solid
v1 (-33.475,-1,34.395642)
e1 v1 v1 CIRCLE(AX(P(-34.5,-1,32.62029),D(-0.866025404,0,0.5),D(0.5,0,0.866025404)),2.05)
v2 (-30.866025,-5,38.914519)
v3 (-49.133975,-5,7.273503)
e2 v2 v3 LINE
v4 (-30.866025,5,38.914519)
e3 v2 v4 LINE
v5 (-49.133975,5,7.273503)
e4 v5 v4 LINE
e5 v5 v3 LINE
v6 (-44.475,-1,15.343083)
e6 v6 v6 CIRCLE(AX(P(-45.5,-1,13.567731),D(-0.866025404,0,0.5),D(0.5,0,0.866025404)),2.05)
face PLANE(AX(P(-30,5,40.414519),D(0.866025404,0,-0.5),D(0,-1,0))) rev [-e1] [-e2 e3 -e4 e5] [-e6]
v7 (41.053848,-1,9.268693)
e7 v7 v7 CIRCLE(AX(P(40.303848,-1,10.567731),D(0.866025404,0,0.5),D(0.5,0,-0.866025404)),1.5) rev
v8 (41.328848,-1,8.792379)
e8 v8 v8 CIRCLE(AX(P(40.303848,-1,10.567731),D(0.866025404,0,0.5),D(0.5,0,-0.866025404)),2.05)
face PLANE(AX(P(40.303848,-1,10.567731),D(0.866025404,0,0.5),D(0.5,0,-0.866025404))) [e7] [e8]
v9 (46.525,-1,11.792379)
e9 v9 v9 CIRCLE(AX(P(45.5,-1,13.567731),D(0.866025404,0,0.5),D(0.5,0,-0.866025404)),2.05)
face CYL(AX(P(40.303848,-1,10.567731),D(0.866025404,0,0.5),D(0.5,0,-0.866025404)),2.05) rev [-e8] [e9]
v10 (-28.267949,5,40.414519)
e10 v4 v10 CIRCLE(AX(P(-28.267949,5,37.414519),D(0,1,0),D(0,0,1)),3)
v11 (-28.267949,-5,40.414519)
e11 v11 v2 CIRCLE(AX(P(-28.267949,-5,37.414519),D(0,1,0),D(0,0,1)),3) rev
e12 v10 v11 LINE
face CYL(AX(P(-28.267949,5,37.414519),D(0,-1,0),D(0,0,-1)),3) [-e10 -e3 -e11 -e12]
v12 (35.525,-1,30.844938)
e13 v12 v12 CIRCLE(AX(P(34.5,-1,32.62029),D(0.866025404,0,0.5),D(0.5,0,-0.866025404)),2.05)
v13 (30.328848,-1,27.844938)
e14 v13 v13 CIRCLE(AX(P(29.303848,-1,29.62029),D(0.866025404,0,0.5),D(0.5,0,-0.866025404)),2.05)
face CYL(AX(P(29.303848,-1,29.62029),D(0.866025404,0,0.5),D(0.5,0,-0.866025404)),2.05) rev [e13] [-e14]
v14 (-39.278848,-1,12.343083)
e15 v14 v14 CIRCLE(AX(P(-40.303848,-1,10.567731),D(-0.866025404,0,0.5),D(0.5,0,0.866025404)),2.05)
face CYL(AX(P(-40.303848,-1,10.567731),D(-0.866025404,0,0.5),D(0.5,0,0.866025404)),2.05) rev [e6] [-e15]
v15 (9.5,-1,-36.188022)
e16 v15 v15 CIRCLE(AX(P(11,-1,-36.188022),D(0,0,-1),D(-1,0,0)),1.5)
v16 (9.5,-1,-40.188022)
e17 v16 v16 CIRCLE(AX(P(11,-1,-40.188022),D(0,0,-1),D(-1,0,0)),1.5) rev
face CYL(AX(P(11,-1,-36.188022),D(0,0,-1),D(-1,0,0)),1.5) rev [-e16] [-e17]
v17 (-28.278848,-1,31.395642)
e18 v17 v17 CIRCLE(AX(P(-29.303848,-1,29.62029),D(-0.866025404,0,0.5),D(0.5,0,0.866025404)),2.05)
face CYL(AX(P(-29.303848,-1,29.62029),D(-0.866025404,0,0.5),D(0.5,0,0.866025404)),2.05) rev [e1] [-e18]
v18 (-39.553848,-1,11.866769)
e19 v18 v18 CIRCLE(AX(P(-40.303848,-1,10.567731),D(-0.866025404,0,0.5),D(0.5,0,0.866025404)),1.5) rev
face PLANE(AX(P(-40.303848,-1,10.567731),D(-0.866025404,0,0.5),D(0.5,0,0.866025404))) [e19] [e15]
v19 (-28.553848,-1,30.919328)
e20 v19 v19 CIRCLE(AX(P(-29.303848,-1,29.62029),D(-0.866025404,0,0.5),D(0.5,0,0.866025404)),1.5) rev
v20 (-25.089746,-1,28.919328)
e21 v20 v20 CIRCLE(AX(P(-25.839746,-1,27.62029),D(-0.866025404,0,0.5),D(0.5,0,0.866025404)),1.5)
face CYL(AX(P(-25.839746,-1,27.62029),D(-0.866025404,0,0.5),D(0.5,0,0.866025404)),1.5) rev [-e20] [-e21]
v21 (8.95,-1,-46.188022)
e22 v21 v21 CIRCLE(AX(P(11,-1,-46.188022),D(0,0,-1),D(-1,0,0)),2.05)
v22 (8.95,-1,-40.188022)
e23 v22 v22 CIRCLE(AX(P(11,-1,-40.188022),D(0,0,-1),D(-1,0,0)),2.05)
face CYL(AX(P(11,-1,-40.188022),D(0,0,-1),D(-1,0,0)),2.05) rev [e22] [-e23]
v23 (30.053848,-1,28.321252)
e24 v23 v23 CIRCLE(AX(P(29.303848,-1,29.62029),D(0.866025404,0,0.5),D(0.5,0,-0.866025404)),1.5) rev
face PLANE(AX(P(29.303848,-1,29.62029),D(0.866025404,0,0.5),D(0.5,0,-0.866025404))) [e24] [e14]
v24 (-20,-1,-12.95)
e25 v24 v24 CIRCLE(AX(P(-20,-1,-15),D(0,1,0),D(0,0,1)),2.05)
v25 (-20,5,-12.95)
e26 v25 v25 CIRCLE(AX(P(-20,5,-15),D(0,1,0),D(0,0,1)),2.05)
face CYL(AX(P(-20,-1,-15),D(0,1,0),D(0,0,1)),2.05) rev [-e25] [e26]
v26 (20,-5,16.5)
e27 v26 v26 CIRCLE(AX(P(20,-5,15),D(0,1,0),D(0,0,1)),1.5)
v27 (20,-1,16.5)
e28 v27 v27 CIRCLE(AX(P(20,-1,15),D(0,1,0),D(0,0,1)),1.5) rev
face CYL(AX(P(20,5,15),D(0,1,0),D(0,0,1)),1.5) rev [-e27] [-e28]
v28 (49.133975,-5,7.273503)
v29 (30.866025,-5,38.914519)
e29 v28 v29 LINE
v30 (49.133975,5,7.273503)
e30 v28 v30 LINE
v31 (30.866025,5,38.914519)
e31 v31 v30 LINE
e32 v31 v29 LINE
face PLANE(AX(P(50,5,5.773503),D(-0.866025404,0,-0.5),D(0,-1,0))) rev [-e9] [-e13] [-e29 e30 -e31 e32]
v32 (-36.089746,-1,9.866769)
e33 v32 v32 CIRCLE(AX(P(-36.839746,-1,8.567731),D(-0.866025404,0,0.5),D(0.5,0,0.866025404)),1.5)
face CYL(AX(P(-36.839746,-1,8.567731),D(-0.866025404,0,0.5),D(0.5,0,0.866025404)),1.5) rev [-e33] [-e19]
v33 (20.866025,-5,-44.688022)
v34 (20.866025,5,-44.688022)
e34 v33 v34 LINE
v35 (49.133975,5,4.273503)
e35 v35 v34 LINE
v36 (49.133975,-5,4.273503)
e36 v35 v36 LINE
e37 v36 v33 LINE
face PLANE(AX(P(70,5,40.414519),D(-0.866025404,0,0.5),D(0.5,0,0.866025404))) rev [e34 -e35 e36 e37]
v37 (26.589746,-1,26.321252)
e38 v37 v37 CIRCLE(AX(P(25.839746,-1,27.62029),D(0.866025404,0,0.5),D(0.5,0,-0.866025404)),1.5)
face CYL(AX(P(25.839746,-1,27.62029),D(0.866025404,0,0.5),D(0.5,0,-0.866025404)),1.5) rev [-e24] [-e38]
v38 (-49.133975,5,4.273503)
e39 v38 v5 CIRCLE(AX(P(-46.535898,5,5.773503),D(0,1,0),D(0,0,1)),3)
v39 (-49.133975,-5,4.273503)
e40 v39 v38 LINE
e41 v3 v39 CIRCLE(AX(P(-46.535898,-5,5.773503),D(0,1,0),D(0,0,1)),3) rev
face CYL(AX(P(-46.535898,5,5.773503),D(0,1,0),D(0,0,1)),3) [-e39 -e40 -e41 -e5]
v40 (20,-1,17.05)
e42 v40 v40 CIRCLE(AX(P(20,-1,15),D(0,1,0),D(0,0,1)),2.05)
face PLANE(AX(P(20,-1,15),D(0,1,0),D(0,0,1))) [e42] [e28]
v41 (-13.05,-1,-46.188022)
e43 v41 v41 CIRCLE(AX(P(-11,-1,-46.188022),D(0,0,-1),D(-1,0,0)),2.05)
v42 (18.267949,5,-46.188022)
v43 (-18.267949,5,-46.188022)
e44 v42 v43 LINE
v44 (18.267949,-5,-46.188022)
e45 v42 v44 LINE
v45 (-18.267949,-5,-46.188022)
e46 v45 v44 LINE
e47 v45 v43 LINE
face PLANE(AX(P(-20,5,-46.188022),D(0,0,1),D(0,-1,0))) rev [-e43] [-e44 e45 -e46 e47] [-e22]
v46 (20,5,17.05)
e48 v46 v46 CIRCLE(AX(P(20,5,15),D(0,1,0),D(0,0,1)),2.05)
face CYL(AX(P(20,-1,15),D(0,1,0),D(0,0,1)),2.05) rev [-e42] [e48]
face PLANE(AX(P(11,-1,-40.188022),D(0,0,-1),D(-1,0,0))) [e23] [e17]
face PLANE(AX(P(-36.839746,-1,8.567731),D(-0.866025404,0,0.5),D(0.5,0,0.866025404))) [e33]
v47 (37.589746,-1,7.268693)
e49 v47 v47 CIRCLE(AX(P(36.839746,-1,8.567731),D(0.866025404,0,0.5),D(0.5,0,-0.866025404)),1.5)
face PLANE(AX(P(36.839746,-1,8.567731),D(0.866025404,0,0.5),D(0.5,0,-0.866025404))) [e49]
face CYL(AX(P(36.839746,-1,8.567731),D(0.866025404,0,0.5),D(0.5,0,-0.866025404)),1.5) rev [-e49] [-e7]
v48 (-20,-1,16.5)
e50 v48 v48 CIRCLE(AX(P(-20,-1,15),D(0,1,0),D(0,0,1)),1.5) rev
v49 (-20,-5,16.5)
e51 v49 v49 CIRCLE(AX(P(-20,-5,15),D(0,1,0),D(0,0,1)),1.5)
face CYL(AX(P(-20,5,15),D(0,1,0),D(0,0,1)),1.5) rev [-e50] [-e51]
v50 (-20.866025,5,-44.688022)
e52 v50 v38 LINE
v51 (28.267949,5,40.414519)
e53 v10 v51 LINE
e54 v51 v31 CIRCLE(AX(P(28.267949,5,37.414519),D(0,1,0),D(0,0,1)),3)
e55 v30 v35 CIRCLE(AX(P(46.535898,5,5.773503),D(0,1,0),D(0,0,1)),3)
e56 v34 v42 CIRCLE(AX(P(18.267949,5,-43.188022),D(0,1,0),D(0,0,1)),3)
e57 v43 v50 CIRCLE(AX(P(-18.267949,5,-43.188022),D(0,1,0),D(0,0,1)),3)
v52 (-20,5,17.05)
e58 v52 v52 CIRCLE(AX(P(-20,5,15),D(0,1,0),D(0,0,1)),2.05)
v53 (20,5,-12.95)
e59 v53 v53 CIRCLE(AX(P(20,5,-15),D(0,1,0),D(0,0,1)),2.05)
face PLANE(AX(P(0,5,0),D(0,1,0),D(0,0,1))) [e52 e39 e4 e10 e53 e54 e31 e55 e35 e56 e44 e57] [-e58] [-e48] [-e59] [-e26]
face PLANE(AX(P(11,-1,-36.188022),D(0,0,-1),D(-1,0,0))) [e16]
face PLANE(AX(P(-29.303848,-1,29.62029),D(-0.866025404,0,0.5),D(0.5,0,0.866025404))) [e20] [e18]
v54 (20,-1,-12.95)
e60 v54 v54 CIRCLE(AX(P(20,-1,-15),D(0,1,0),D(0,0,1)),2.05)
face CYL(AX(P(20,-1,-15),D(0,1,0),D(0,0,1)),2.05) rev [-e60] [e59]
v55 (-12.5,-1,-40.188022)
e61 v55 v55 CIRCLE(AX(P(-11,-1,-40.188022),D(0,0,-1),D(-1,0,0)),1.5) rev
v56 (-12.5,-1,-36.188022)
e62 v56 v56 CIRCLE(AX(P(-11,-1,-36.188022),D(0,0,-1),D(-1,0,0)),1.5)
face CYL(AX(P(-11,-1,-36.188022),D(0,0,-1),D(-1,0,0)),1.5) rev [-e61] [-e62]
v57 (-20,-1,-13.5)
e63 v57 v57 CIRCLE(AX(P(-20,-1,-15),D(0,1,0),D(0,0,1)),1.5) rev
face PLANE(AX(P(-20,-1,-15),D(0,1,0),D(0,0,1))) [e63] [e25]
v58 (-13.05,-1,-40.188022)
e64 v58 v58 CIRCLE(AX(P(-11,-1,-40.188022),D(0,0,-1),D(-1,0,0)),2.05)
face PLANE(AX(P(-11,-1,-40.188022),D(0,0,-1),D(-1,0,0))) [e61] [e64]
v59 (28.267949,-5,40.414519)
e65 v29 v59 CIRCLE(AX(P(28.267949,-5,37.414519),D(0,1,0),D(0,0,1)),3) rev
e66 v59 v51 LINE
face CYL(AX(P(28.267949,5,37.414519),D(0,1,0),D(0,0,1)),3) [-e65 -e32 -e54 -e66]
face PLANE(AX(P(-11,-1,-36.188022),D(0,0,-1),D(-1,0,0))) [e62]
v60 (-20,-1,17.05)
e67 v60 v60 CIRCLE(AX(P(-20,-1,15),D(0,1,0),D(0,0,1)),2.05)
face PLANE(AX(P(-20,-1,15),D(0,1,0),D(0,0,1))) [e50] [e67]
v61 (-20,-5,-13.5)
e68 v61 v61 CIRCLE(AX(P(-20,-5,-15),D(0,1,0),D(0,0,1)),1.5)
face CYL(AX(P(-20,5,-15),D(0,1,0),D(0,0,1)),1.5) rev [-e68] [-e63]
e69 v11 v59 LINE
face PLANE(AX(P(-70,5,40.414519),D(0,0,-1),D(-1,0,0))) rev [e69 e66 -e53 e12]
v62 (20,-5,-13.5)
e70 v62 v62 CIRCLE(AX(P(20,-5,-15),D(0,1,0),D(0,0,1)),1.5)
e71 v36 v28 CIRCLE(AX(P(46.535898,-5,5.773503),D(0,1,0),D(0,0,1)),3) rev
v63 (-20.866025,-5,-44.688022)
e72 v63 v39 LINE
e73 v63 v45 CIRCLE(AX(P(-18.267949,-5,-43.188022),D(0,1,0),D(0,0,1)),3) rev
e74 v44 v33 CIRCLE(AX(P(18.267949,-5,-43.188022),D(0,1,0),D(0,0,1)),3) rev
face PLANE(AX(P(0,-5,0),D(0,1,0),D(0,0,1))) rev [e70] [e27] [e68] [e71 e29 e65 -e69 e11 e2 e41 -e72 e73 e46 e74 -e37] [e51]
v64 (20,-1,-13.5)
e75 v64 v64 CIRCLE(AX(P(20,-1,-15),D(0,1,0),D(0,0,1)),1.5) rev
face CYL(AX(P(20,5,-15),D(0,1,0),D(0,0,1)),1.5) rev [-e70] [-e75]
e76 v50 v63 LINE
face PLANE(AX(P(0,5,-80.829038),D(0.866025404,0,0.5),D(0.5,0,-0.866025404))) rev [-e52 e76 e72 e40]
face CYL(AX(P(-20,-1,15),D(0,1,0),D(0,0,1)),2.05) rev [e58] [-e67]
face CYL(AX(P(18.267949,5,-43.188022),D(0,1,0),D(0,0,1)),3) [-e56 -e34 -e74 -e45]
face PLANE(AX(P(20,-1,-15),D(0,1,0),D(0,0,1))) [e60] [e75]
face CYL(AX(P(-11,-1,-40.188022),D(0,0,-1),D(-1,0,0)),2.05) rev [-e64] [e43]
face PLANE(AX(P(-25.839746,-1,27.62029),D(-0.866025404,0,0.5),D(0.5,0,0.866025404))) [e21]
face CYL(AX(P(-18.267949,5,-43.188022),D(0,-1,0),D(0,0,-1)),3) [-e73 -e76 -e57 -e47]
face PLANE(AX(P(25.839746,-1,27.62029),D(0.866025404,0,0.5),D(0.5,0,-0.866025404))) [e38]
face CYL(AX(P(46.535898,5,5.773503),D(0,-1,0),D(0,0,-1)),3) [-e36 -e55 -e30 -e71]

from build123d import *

# Parameters (mm, degrees)
BOSS_EXTRUDE1_DEPTH     = 5
CHAMFER1_SIZE           = 40
SKETCH4_R               = 1.5
CUT_EXTRUDE1_DEPTH      = 10
SKETCH10_R              = 2.05
CUT_EXTRUDE3_DEPTH      = 6
CRVPATTERN1_START       = -46.188021535
CRVPATTERN1_OUTLINE_R   = 2.05
CRVPATTERN1_DEPTH       = 6
CRVPATTERN1_START_2     = -40.188021535
CRVPATTERN1_2_OUTLINE_R = 1.5
CRVPATTERN1_2_DEPTH     = 4
CRVPATTERN1_3_OUTLINE_R = 2.05
CRVPATTERN1_3_DEPTH     = 6
CRVPATTERN1_4_OUTLINE_R = 1.5
CRVPATTERN1_4_DEPTH     = 4
F_3_0MM_DOWEL_HOLE1_D   = 3
FILLET1_R               = 3
SKETCH9_R               = 2.05
CUT_EXTRUDE2_DEPTH      = 6


# Read off the part's stored shape, not the designer's step: CrvPattern1
with BuildPart() as part:
    # Sketch2 → Boss-Extrude1 (new, symmetric)
    with BuildSketch(Plane(origin=(0, 0, 0), x_dir=(1, 0, 0), z_dir=(0, 1, 0))):
        Polygon((70, -40.414518843), (0, 80.829037687), (-70, -40.414518843), align=None)
    extrude(amount=BOSS_EXTRUDE1_DEPTH, both=True)

    # Chamfer1
    chamfer1_edges = [part.edges().sort_by_distance(p)[0] for p in [
        (-70, 0, 40.414518843),
        (0, 0, -80.829037687),
        (70, 0, 40.414518843),
    ]]
    chamfer(chamfer1_edges, length=CHAMFER1_SIZE)

    # Sketch4 → Cut-Extrude1 (cut)
    with BuildSketch(Plane(origin=(40, 0, 23.094010768), x_dir=(0.5000000000000004, 0, -0.8660254037844384), z_dir=(0.8660254037844384, 0, 0.5000000000000004))):
        with Locations((-11, -1)):
            Circle(SKETCH4_R)
        with Locations((11, -1)):
            Circle(SKETCH4_R)
    extrude(amount=-CUT_EXTRUDE1_DEPTH, mode=Mode.SUBTRACT)

    # Sketch10 → Cut-Extrude3 (cut)
    with BuildSketch(Plane(origin=(40, 0, 23.094010768), x_dir=(0.4999999999999997, 0, -0.8660254037844388), z_dir=(0.8660254037844389, 0, 0.49999999999999983))):
        with Locations((-11, -1)):
            Circle(SKETCH10_R)
        with Locations((11, -1)):
            Circle(SKETCH10_R)
    extrude(amount=-CUT_EXTRUDE3_DEPTH, mode=Mode.SUBTRACT)

    # CrvPattern1 outline → CrvPattern1 (cut)
    with BuildSketch(Plane.XY.offset(CRVPATTERN1_START)):
        with Locations((11, -1)):
            Circle(CRVPATTERN1_OUTLINE_R)
        with Locations((-11, -1)):
            Circle(CRVPATTERN1_OUTLINE_R)
    extrude(amount=CRVPATTERN1_DEPTH, mode=Mode.SUBTRACT)

    # CrvPattern1 2 outline → CrvPattern1 2 (cut)
    with BuildSketch(Plane.XY.offset(CRVPATTERN1_START_2)):
        with Locations((11, -1)):
            Circle(CRVPATTERN1_2_OUTLINE_R)
        with Locations((-11, -1)):
            Circle(CRVPATTERN1_2_OUTLINE_R)
    extrude(amount=CRVPATTERN1_2_DEPTH, mode=Mode.SUBTRACT)

    # CrvPattern1 3 outline → CrvPattern1 3 (cut)
    with BuildSketch(Plane(origin=(0, 0, 0), x_dir=(0.500000000000013, 0, 0.8660254037844313), z_dir=(0.8660254037844312, 0, -0.5000000000000131)).offset(CRVPATTERN1_START)):
        with Locations((-11, 1)):
            Circle(CRVPATTERN1_3_OUTLINE_R)
        with Locations((11, 1)):
            Circle(CRVPATTERN1_3_OUTLINE_R)
    extrude(amount=CRVPATTERN1_3_DEPTH, mode=Mode.SUBTRACT)

    # CrvPattern1 4 outline → CrvPattern1 4 (cut)
    with BuildSketch(Plane(origin=(0, 0, 0), x_dir=(0.500000000000013, 0, 0.8660254037844313), z_dir=(0.8660254037844312, 0, -0.5000000000000131)).offset(CRVPATTERN1_START_2)):
        with Locations((-11, 1)):
            Circle(CRVPATTERN1_4_OUTLINE_R)
        with Locations((11, 1)):
            Circle(CRVPATTERN1_4_OUTLINE_R)
    extrude(amount=CRVPATTERN1_4_DEPTH, mode=Mode.SUBTRACT)

    # Ø3.0mm Dowel Hole1 (through all)
    with Locations(Plane(origin=(0, 5, 0), x_dir=(1, 0, 0), z_dir=(0, 1, 0))):
        with Locations((-20, 15), (20, 15), (20, -15), (-20, -15)):
            Hole(F_3_0MM_DOWEL_HOLE1_D / 2)

    # Fillet1
    fillet1_edges = [part.edges().sort_by_distance(p)[0] for p in [
        (20, 0, -46.188021535),
        (50, 0, 5.773502692),
        (-30, 0, 40.414518843),
        (30, 0, 40.414518843),
        (-50, 0, 5.773502692),
        (-20, 0, -46.188021535),
    ]]
    fillet(fillet1_edges, radius=FILLET1_R)

    # Sketch9 → Cut-Extrude2 (cut)
    with BuildSketch(Plane(origin=(0, 5, 0), x_dir=(1, 0, 0), z_dir=(0, 1, 0))):
        with Locations(Location((-20, 15, 0), (0, 0, 270))):
            Circle(SKETCH9_R)
        with Locations(Location((20, 15, 0), (0, 0, 270))):
            Circle(SKETCH9_R)
        with Locations(Location((20, -15, 0), (0, 0, 270))):
            Circle(SKETCH9_R)
        with Locations(Location((-20, -15, 0), (0, 0, 270))):
            Circle(SKETCH9_R)
    extrude(amount=-CUT_EXTRUDE2_DEPTH, mode=Mode.SUBTRACT)


solid = part.part
